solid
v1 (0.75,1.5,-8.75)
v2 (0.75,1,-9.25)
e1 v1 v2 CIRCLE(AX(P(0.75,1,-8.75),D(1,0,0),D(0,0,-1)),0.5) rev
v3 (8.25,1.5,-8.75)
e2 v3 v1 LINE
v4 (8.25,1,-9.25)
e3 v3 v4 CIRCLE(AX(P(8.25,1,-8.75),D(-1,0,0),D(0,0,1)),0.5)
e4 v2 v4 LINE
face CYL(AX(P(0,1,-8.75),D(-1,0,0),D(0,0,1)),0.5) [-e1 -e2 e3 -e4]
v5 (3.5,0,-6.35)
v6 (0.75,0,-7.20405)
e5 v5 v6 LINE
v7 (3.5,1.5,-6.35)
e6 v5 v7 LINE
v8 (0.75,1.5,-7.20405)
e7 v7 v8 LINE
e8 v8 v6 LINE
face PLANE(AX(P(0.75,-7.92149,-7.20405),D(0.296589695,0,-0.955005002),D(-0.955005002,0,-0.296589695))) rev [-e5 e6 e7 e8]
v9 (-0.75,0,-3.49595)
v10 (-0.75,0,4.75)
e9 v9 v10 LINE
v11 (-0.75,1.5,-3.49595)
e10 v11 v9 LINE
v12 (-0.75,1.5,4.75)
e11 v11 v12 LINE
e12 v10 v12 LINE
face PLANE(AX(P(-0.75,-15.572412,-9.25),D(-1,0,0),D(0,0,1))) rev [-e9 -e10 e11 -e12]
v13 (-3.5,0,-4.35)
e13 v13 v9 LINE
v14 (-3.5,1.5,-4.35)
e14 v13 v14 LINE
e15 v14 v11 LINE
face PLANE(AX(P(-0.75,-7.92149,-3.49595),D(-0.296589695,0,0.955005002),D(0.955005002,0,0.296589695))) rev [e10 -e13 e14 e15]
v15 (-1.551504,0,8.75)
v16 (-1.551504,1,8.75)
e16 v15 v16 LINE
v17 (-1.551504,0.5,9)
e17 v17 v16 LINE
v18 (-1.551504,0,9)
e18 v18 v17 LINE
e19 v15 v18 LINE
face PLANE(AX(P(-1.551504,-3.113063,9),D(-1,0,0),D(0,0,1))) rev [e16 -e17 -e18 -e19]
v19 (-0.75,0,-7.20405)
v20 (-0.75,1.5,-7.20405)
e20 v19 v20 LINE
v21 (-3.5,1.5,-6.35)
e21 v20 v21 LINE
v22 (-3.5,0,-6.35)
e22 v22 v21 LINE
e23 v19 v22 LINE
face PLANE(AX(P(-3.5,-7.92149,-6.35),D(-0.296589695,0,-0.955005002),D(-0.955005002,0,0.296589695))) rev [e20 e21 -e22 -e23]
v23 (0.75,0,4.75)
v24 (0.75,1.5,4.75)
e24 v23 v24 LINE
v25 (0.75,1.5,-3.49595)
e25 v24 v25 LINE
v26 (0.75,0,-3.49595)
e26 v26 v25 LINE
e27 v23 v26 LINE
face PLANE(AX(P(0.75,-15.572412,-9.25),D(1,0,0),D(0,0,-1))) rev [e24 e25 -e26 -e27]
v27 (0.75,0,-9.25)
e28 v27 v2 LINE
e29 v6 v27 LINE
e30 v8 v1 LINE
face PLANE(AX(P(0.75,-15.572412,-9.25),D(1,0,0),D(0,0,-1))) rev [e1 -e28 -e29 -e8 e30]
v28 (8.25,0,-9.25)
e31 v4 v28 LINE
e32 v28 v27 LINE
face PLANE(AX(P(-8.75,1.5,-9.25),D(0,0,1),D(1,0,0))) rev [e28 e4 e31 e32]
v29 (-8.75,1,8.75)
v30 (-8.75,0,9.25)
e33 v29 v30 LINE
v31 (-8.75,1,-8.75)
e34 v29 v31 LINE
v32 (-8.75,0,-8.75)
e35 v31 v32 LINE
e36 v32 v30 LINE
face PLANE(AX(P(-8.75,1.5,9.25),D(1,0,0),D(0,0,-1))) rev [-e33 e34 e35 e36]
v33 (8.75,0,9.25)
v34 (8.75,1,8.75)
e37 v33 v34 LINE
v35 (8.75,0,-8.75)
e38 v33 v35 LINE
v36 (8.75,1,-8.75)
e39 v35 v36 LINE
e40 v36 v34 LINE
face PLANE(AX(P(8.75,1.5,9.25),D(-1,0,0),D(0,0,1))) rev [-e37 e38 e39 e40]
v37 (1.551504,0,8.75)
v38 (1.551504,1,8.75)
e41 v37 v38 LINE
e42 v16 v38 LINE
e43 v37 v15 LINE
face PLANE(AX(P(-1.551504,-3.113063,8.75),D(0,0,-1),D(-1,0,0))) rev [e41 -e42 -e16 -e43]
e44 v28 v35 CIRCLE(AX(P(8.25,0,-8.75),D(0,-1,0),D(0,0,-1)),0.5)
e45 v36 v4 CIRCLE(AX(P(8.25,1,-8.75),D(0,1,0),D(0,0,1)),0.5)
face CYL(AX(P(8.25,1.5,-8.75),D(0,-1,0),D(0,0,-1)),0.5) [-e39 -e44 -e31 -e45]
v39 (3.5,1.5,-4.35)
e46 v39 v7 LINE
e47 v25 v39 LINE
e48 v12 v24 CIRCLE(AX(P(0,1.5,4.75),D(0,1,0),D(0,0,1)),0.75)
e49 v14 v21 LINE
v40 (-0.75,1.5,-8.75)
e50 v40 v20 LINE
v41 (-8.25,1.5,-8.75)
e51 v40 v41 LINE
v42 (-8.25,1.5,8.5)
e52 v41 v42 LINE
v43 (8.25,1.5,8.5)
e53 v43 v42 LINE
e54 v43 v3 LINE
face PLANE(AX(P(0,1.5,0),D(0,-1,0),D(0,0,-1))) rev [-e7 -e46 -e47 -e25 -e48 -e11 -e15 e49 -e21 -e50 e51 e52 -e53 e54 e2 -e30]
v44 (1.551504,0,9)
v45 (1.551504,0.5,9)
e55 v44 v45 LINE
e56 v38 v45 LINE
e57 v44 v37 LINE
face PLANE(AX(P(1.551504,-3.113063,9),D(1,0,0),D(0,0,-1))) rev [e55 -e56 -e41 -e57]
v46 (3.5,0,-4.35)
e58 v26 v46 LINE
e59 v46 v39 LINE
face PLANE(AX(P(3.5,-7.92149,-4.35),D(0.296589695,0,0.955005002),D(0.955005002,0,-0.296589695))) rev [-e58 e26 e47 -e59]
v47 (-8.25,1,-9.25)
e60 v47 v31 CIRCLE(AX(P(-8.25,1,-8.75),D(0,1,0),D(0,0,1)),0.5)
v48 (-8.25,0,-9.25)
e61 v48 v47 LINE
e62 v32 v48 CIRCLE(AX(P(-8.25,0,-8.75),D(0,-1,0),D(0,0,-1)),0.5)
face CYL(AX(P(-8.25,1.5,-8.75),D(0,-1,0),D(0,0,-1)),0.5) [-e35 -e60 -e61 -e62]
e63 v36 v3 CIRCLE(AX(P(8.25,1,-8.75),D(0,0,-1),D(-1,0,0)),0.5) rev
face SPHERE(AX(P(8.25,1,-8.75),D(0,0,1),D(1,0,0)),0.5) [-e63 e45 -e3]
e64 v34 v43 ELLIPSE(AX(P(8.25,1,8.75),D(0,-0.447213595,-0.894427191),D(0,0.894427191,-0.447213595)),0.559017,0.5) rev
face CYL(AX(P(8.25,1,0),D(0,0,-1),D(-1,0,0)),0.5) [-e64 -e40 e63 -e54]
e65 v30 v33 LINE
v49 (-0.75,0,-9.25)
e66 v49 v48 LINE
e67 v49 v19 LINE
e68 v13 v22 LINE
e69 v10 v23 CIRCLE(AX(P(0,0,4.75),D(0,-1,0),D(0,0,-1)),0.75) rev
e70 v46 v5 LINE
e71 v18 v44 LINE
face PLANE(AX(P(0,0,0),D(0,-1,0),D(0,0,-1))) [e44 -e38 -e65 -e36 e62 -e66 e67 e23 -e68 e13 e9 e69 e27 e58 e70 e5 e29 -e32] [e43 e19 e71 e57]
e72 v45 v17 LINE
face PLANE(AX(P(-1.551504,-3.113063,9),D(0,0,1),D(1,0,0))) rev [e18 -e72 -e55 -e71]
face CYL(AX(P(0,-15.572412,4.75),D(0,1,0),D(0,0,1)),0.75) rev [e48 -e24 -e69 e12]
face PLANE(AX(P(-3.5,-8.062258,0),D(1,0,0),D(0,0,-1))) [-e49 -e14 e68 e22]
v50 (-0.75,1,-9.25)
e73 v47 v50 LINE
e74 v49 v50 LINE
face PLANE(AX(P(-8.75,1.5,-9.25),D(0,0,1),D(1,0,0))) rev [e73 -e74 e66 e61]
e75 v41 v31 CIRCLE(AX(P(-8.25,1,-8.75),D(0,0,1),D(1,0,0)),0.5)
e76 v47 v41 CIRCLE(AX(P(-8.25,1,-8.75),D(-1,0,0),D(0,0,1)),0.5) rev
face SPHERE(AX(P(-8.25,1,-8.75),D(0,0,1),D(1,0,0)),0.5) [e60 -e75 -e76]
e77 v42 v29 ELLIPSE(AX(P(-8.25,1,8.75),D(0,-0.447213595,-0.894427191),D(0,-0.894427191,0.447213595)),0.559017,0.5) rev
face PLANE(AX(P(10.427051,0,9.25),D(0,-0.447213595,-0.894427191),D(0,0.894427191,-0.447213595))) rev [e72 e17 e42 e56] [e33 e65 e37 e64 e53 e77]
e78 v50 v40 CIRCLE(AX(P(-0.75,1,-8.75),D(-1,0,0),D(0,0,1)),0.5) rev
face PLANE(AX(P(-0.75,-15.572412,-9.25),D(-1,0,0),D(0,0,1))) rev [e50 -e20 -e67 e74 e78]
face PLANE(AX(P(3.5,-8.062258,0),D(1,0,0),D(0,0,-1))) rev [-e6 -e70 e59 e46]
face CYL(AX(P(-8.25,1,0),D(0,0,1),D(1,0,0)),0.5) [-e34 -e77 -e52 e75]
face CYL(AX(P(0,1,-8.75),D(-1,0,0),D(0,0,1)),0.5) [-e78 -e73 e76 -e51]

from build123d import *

# Parameters (mm, degrees)
SKIZZE1_W                       = 17.5
SKIZZE1_H                       = 18.5
AUFSATZ_LINEAR_AUSTRAGEN1_DEPTH = 1.5
VERRUNDUNG1_R                   = 0.5
SCHNITT_LINEAR_AUSTRAGEN1_REACH = 21.851
VERRUNDUNG2_R                   = 0.5
SCHL_SSELLOCH_DEPTH             = 1.5
SKIZZE6_W                       = 3.103008178
SKIZZE6_H                       = 0.25
GRIFF_DEPTH                     = 1.5
LANGLOCH_ANTENNE_START          = -1.5
LANGLOCH_ANTENNE_DEPTH          = 1.5
SCHNITT_LINEAR_AUSTRAGEN2_DEPTH = 1.5


with BuildPart() as part:
    # Skizze1 → Aufsatz-Linear austragen1 (new body)
    with BuildSketch(Plane(origin=(0, 0, 0), x_dir=(1, 0, 0), z_dir=(0, 1, 0))):
        Rectangle(SKIZZE1_W, SKIZZE1_H)
    extrude(amount=AUFSATZ_LINEAR_AUSTRAGEN1_DEPTH)

    # Verrundung1
    verrundung1_edges = [part.edges().sort_by_distance(p)[0] for p in [
        (-8.75, 1.5, 0),
        (8.75, 1.5, 0),
        (0, 1.5, -9.25),
    ]]
    fillet(verrundung1_edges, radius=VERRUNDUNG1_R)

    # Schnitt-Linear austragen1: up to this face of the body (flat: up to its plane)
    schnitt_linear_austragen1_end = Plane(part.part.faces().sort_by_distance((8.75, 0.5, 0))[0])
    # Skizze2 → Schnitt-Linear austragen1 (cut, up to the picked face)
    with BuildSketch(Plane.ZY.offset(8.75), mode=Mode.PRIVATE) as schnitt_linear_austragen1_sk1:
        Polygon((9.25, 0), (8.5, 1.5), (9.25, 1.5), align=None)
    schnitt_linear_austragen1_tool1 = split(extrude(schnitt_linear_austragen1_sk1.sketch, amount=-SCHNITT_LINEAR_AUSTRAGEN1_REACH, mode=Mode.PRIVATE), bisect_by=schnitt_linear_austragen1_end, keep=Keep.BOTH, mode=Mode.PRIVATE)
    add(schnitt_linear_austragen1_tool1.solids().sort_by(Axis((-8.75, 1, 9), (1, 0, 0)))[0], mode=Mode.SUBTRACT)

    # Verrundung2
    # the kernel refuses this fillet: 0.5 mm, written as the material it takes off along each edge
    with BuildSketch(Plane(origin=(-8.25, 1, -8.75), x_dir=(-1, 0, 0), z_dir=(0, 0, -1))) as verrundung2_piece_1_section:
        Polygon((0, 0), (VERRUNDUNG2_R, 0), (VERRUNDUNG2_R, VERRUNDUNG2_R), (0, VERRUNDUNG2_R), align=None)
    verrundung2_piece_1 = extrude(amount=VERRUNDUNG2_R, mode=Mode.PRIVATE)
    verrundung2_piece_1 = verrundung2_piece_1 - Plane(origin=(-8.25, 1, -8.75), x_dir=(0.7071067811865475, -0.7071067811865475, 0), z_dir=(0, 0, -1)) * Sphere(VERRUNDUNG2_R, mode=Mode.PRIVATE)
    add(verrundung2_piece_1, mode=Mode.SUBTRACT)
    with BuildSketch(Plane(origin=(8.25, 1, -8.75), x_dir=(0, 0, -1), z_dir=(1, 0, 0))) as verrundung2_piece_2_section:
        Polygon((0, 0), (VERRUNDUNG2_R, 0), (VERRUNDUNG2_R, VERRUNDUNG2_R), (0, VERRUNDUNG2_R), align=None)
    verrundung2_piece_2 = extrude(amount=VERRUNDUNG2_R, mode=Mode.PRIVATE)
    verrundung2_piece_2 = verrundung2_piece_2 - Plane(origin=(8.25, 1, -8.75), x_dir=(0, -0.7071067811865475, 0.7071067811865475), z_dir=(1, 0, 0)) * Sphere(VERRUNDUNG2_R, mode=Mode.PRIVATE)
    add(verrundung2_piece_2, mode=Mode.SUBTRACT)
    with BuildSketch(Plane(origin=(8.75, -1.25, -9.25), x_dir=(0, 0, 1), z_dir=(0, 1, 0)), Plane(origin=(-8.75, -1.25, -9.25), x_dir=(1, 0, 0), z_dir=(0, 1, 0))) as verrundung2_piece_3:
        with BuildLine():
            CenterArc((VERRUNDUNG2_R, -VERRUNDUNG2_R), VERRUNDUNG2_R, 90, 90)
            Line((0, -VERRUNDUNG2_R), (0, 0))
            Line((0, 0), (VERRUNDUNG2_R, 0))
        make_face()
    extrude(amount=2.25, mode=Mode.SUBTRACT)

    # Skizze5 → Schlüsselloch (cut)
    with BuildSketch(Plane(origin=(0, 1.5, 0), x_dir=(1, 0, 0), z_dir=(0, 1, 0))):
        with BuildLine():
            Line((-3.5, 6.35), (-3.5, 4.35))
            Line((-3.5, 4.35), (-1.732050808, 4.35))
            ThreePointArc((-1.732050808, 4.35), (-2, 5.35), (-1.732050808, 6.35))
            Line((-1.732050808, 6.35), (-3.5, 6.35))
        make_face()
        with BuildLine():
            ThreePointArc((1.732050808, 6.35), (0, 7.35), (-1.732050808, 6.35))
            Line((-1.732050808, 6.35), (1.732050808, 6.35))
        make_face()
        with BuildLine():
            ThreePointArc((-1.732050808, 6.35), (-2, 5.35), (-1.732050808, 4.35))
            Line((-1.732050808, 4.35), (1.732050808, 4.35))
            ThreePointArc((1.732050808, 4.35), (1.931851653, 4.83236191), (2, 5.35))
            ThreePointArc((2, 5.35), (1.931851653, 5.86763809), (1.732050808, 6.35))
            Line((1.732050808, 6.35), (-1.732050808, 6.35))
        make_face()
        with BuildLine():
            Line((1.732050808, 4.35), (-1.732050808, 4.35))
            ThreePointArc((-1.732050808, 4.35), (0, 3.35), (1.732050808, 4.35))
        make_face()
        with BuildLine():
            ThreePointArc((2, 5.35), (1.931851653, 4.83236191), (1.732050808, 4.35))
            Line((1.732050808, 4.35), (3.5, 4.35))
            Line((3.5, 4.35), (3.5, 6.35))
            Line((3.5, 6.35), (1.732050808, 6.35))
            ThreePointArc((1.732050808, 6.35), (1.931851653, 5.86763809), (2, 5.35))
        make_face()
    extrude(amount=-SCHL_SSELLOCH_DEPTH, mode=Mode.SUBTRACT)

    # Skizze6 → Griff (cut)
    with BuildSketch(Plane(origin=(0, 1.5, 0), x_dir=(1, 0, 0), z_dir=(0, 1, 0))):
        with Locations((0, -8.875)):
            Rectangle(SKIZZE6_W, SKIZZE6_H)
    extrude(amount=-GRIFF_DEPTH, mode=Mode.SUBTRACT)

    # Skizze7 → Langloch_Antenne (cut)
    with BuildSketch(Plane(origin=(0, 1.5, 0), x_dir=(1, 0, 0), z_dir=(0, 1, 0)).offset(LANGLOCH_ANTENNE_START)):
        with BuildLine():
            Line((0.75, 9.25), (0.75, -4.75))
            ThreePointArc((0.75, -4.75), (0, -5.5), (-0.75, -4.75))
            Line((-0.75, -4.75), (-0.75, 9.25))
            ThreePointArc((-0.75, 9.25), (0, 10), (0.75, 9.25))
        make_face()
    extrude(amount=LANGLOCH_ANTENNE_DEPTH, mode=Mode.SUBTRACT)

    # Skizze8 → Schnitt-Linear austragen2 (cut)
    with BuildSketch(Plane(origin=(0, 1.5, 0), x_dir=(1, 0, 0), z_dir=(0, 1, 0))):
        Polygon((3.5, 4.35), (0.75, 3.495950378), (-0.75, 3.495950378), (-3.5, 4.35), (-3.5, 6.35), (-0.75, 7.204049622), (0.75, 7.204049622), (3.5, 6.35), align=None)
    extrude(amount=-SCHNITT_LINEAR_AUSTRAGEN2_DEPTH, mode=Mode.SUBTRACT)


solid = part.part
